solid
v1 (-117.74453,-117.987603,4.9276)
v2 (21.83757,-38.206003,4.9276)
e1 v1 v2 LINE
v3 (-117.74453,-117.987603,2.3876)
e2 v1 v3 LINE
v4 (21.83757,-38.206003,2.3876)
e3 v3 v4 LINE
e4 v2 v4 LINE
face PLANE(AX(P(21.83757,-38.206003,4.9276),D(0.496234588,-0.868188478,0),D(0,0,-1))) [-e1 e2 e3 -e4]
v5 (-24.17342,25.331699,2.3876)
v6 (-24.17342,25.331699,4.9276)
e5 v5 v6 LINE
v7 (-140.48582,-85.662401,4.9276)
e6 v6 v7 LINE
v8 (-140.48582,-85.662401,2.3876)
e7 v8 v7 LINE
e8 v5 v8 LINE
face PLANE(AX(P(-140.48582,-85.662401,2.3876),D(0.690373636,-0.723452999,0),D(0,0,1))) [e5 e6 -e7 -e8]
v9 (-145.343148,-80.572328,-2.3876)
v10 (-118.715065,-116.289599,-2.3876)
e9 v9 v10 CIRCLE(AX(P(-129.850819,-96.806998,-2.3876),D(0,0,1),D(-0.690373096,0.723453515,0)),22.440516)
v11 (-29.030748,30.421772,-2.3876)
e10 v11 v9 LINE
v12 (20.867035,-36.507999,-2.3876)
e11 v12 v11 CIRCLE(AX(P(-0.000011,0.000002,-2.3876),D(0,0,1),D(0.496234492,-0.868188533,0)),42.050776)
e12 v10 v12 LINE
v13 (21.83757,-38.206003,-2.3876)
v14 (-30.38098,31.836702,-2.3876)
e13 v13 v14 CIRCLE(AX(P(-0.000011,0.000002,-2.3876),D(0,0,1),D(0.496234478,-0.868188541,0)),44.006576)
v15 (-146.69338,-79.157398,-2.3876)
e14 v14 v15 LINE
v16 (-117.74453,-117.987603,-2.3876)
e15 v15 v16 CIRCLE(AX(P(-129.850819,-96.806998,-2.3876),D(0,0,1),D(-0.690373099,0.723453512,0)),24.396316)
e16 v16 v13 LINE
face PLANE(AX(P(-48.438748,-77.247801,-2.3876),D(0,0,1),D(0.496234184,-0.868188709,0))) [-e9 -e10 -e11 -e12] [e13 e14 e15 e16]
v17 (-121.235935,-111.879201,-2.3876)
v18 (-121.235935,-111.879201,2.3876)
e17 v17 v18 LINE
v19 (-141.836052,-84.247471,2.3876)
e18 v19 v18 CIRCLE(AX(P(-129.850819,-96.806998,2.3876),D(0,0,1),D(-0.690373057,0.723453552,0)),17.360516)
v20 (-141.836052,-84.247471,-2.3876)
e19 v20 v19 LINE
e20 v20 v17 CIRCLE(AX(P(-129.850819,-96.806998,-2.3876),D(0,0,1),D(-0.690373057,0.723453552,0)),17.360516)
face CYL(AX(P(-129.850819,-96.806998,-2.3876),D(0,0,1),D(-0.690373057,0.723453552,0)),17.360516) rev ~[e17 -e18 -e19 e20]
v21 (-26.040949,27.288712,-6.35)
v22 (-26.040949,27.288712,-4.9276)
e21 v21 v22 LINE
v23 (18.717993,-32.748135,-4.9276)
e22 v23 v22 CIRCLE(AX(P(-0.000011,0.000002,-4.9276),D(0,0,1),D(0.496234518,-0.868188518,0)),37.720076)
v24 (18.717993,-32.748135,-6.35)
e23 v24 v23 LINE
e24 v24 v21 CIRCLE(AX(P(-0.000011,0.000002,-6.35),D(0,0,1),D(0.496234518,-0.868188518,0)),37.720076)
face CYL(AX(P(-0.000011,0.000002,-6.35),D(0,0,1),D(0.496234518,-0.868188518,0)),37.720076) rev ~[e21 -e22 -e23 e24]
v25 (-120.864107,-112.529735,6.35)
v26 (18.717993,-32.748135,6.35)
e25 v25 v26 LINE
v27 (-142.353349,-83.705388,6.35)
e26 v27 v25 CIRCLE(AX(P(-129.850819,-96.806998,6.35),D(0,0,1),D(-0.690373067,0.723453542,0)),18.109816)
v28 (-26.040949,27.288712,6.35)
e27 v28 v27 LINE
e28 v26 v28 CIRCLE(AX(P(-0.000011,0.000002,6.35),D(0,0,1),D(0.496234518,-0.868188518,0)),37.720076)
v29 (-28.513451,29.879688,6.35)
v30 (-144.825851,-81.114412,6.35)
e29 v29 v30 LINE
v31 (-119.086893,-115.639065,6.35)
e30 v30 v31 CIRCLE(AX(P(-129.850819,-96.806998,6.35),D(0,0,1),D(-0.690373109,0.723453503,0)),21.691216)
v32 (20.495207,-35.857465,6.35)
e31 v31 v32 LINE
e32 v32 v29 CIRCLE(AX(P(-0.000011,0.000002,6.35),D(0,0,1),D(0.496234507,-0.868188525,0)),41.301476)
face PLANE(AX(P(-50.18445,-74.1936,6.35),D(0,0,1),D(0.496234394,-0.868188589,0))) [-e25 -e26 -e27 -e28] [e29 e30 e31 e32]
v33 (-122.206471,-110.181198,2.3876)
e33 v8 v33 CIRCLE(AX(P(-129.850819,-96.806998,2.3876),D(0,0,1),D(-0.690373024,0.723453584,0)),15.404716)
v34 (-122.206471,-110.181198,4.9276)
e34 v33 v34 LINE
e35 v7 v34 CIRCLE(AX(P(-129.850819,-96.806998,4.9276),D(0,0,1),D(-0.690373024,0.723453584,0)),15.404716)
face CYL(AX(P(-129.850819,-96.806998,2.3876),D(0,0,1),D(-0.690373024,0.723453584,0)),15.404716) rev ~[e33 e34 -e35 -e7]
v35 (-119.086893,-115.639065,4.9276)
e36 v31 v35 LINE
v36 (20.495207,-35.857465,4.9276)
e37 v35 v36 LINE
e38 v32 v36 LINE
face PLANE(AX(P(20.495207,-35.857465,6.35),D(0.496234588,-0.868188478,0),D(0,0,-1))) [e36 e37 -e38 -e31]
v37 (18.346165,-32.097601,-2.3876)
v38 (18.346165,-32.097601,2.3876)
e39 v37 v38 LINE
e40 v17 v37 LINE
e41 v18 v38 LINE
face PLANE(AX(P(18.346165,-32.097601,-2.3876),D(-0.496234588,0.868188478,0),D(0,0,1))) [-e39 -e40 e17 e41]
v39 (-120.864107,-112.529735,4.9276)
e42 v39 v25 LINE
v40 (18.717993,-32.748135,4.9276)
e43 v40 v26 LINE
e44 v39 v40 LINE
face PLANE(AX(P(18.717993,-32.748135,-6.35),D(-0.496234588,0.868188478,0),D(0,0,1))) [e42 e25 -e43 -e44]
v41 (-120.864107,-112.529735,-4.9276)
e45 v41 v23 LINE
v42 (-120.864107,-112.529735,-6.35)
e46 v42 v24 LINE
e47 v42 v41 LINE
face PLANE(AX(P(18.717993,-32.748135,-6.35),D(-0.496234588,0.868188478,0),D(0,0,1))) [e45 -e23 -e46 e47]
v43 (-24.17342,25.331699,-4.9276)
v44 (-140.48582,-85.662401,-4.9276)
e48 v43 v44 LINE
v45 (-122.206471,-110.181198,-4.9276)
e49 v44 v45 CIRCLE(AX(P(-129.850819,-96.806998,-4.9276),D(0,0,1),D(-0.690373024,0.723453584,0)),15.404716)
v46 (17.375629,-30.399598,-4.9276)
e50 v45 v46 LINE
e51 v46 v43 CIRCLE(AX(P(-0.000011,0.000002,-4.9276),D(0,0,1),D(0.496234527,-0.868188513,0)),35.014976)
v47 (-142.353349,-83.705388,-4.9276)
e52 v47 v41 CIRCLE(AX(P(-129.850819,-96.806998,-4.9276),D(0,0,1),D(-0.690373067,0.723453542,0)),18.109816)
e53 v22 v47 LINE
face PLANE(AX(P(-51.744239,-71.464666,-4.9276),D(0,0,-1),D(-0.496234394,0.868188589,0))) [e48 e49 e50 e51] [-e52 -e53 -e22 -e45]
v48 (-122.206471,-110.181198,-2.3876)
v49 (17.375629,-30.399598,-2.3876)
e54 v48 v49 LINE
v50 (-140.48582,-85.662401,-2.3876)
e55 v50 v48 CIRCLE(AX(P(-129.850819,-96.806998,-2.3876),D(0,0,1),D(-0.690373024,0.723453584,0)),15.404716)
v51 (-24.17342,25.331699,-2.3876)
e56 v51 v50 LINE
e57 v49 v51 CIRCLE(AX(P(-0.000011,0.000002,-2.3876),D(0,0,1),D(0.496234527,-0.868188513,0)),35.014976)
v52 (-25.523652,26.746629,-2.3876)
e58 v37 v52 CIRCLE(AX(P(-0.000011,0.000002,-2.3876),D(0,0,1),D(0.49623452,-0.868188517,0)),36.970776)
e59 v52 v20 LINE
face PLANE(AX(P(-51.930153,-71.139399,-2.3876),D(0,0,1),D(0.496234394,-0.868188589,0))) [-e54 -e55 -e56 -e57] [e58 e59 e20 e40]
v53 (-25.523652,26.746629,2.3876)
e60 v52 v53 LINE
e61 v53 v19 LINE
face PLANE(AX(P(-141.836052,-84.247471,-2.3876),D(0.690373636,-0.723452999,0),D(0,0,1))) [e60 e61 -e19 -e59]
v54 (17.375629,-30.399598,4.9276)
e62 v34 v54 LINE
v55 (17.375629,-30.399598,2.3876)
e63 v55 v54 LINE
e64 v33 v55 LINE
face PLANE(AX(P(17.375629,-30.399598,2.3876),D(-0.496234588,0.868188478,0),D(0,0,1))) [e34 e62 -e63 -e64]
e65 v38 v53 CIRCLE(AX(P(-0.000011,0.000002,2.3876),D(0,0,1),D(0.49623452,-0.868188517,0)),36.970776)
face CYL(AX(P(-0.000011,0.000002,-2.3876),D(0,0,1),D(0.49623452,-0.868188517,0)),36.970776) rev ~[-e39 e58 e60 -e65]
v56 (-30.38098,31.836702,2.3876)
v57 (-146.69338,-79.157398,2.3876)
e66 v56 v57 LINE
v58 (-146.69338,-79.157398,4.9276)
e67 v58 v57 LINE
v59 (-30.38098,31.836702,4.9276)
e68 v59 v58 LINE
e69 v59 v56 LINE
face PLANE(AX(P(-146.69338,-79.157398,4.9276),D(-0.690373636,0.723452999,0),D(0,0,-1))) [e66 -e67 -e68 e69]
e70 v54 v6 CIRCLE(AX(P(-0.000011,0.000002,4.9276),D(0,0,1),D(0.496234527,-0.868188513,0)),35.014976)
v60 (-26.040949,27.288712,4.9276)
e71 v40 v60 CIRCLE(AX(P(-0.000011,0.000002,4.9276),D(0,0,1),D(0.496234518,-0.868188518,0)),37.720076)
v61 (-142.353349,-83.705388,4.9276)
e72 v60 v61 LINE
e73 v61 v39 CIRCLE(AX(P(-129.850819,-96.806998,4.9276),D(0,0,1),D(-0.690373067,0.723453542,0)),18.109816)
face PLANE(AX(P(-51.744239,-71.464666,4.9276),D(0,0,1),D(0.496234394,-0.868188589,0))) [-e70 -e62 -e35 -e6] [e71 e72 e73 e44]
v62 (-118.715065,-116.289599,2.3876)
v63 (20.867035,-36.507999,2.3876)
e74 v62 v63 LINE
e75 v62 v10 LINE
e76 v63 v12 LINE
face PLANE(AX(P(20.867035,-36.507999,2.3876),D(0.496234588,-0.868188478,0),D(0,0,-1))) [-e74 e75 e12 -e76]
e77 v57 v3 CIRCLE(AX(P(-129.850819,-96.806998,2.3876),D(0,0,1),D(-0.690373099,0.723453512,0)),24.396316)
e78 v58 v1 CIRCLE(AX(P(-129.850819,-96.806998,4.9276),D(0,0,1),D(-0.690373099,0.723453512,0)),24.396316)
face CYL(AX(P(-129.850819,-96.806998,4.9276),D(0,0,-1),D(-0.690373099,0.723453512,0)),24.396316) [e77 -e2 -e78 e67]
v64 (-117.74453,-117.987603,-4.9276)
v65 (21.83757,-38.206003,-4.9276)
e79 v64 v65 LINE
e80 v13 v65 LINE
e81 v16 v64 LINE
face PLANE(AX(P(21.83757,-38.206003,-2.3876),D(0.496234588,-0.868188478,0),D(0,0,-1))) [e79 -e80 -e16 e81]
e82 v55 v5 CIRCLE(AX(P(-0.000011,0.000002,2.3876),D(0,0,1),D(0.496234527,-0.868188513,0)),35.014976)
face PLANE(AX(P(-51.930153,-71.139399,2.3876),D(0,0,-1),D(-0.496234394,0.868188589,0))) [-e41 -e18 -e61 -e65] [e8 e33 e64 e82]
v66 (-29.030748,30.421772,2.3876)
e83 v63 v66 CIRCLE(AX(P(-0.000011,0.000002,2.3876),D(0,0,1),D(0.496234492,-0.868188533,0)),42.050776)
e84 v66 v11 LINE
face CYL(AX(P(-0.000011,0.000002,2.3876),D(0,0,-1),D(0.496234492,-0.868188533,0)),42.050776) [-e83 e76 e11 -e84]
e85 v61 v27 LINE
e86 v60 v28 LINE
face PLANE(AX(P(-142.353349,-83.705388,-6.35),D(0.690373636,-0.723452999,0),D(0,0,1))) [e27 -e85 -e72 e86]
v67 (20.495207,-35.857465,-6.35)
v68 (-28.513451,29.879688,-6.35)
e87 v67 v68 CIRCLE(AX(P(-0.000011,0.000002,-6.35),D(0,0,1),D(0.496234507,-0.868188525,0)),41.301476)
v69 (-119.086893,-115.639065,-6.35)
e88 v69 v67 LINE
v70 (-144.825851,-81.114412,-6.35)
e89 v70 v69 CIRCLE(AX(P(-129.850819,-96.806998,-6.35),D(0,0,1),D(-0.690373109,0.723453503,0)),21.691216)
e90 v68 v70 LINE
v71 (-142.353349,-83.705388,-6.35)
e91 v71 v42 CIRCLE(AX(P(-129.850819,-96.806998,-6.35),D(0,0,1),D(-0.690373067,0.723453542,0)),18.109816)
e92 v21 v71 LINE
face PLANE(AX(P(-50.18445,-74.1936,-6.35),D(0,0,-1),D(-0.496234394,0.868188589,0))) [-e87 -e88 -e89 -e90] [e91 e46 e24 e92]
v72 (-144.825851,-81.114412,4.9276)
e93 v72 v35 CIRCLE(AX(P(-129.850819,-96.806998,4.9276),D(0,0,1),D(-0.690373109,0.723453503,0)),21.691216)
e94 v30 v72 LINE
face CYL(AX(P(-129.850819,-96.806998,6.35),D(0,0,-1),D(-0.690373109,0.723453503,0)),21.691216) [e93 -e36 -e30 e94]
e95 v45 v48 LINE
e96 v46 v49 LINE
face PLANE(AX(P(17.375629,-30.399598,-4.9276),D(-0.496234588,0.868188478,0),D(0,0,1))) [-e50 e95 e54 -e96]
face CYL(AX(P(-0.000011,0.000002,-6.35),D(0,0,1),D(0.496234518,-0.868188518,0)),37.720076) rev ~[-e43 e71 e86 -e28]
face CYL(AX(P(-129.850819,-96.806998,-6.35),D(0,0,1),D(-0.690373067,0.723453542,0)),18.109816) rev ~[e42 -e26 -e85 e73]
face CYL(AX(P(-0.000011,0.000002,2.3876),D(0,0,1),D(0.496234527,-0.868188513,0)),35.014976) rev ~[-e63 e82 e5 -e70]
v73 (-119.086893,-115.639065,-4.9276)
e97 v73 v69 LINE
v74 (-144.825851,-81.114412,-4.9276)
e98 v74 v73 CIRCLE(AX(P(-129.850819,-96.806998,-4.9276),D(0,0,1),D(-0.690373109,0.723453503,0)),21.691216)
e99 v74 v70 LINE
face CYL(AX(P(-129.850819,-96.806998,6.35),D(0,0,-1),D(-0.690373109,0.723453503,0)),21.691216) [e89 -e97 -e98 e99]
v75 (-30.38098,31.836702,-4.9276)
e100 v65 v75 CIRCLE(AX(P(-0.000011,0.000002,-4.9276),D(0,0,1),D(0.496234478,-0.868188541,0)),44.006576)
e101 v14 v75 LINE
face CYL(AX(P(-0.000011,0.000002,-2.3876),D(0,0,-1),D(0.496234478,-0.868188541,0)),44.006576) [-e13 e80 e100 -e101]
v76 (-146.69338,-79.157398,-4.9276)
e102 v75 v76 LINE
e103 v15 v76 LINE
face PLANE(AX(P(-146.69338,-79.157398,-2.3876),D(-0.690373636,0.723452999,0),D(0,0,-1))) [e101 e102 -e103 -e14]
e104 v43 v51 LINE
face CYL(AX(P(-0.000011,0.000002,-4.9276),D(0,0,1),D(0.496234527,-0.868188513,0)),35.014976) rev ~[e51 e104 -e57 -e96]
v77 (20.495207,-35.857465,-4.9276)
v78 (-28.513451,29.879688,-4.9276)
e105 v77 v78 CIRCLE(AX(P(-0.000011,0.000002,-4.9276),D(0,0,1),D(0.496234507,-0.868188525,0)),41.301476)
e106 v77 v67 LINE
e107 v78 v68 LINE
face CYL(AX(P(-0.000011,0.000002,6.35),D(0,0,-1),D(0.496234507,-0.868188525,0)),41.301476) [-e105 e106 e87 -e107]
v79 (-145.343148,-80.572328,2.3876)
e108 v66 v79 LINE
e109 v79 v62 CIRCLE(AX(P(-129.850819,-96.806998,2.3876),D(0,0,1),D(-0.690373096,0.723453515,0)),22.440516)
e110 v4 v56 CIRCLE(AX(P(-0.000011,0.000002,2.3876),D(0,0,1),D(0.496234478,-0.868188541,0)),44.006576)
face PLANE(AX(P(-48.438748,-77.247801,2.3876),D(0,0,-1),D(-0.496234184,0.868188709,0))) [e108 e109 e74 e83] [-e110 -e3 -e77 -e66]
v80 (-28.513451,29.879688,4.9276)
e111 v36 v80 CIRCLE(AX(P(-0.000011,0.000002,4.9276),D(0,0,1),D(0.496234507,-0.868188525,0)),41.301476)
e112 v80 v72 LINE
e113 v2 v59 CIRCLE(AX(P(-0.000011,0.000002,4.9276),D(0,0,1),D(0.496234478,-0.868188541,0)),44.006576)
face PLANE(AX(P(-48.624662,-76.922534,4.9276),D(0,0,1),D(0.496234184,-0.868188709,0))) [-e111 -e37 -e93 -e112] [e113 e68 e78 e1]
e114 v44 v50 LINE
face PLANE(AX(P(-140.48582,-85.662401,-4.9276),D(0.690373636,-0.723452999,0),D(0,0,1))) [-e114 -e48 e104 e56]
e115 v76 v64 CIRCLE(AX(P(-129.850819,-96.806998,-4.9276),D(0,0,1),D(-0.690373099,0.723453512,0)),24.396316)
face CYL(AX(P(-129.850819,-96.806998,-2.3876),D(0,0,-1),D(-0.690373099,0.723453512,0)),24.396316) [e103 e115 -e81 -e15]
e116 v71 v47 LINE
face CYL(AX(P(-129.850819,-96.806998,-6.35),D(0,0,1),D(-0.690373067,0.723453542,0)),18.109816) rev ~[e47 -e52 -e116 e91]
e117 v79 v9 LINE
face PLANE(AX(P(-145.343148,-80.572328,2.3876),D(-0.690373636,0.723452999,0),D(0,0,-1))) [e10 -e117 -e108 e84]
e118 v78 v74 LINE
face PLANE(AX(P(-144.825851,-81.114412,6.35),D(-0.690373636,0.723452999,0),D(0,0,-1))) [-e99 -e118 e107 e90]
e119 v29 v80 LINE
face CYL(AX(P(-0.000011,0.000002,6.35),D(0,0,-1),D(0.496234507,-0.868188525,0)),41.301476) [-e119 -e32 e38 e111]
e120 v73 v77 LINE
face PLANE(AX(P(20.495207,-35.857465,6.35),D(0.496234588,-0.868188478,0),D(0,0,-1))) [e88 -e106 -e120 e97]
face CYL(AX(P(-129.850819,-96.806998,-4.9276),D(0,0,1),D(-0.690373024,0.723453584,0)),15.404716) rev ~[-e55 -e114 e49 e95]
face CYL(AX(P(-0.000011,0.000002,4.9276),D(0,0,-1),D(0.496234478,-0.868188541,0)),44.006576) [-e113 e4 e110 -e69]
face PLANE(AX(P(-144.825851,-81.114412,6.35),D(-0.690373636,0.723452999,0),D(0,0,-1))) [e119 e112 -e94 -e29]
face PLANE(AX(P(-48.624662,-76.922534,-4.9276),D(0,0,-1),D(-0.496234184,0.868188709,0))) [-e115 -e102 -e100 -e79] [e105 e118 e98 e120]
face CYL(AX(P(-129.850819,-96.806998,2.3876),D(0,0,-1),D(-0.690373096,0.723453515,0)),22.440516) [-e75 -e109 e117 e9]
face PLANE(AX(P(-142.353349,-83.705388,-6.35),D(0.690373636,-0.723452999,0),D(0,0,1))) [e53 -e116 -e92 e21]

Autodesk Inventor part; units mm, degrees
ref_plane "Work Plane2" through (-129.8508, -96.807, 0) normal (-1, 0, 0) x (0, 0, 1)
ref_plane "Work Plane3" through (0, 0, 0) normal (-0.8287064, -0.5596835, 0) x (0, 0, 1)
sketch "Path" plane through (0, 0, 0) normal (0, 0, 1) x (1, 0, 0)
  arc A0 (-143.5896, -82.4099) -> (-119.9755, -114.0844) centre (-129.8508, -96.807) ccw
  arc A1 (19.6066, -34.3028) -> (-27.2772, 28.5842) centre (0, 0) ccw
  line L0 (19.6066, -34.3028) -> (-119.9755, -114.0844)
  line L1 (-143.5896, -82.4099) -> (-27.2772, 28.5842)
  dimension "d31" = 8.9916
ref_plane "Section Plane" through (-119.9755, -114.0844, 0) normal (0.8681886, 0.4962344, 0) x (0, 0, 1)
sketch "Section Sketch" plane through (-119.9755, -114.0844, 0) normal (0.8681886, 0.4962344, 0) x (0, 0, 1)
  line L0 (-6.35, -1.7907) -> (6.35, -1.7907)
  line L1 (6.35, -1.7907) -> (6.35, 1.7907)
  line L2 (6.35, 1.7907) -> (-6.35, 1.7907)
  line L3 (-6.35, 1.7907) -> (-6.35, -1.7907)
  line L4 (-2.3876, -2.54) -> (2.3876, -2.54)
  line L5 (2.3876, -2.54) -> (2.3876, 2.54)
  line L6 (2.3876, 2.54) -> (-2.3876, 2.54)
  line L7 (-2.3876, 2.54) -> (-2.3876, -2.54)
  line L8 (-2.3876, 0) -> (2.3876, 0) construction
  line L9 (-4.9276, -4.4958) -> (-2.3876, -4.4958)
  line L10 (-2.3876, -4.4958) -> (-2.3876, 4.4958)
  line L11 (-2.3876, 4.4958) -> (-4.9276, 4.4958)
  line L12 (-4.9276, 4.4958) -> (-4.9276, -4.4958)
  line L13 (2.3876, -4.4958) -> (4.9276, -4.4958)
  line L14 (4.9276, -4.4958) -> (4.9276, 4.4958)
  line L15 (4.9276, 4.4958) -> (2.3876, 4.4958)
  line L16 (2.3876, 4.4958) -> (2.3876, -4.4958)
  line L17 (-6.35, 0) -> (6.35, 0) construction
  point P0 (0, 0)
  point P1 (0, 0)
  dimension "d21" = 3.5814
  dimension "d22" = 5.08
  dimension "d23" = 4.7752
  dimension "d24" = 2.54
  dimension "d31" = 8.9916
  dimension "d32" = 12.7
sweep "Solid" add profiles "Section Sketch" path "Path"
pattern_of_one "Strand Pattern"
equation "\"d21\" = da_d2"
equation "\"d22\" = da_d1"
equation "\"d23\" = da_b1"
equation "\"d24\" = da_t1 + da_t2"
equation "\"d30\" = da_pt"
equation "\"da_p\" = 9.525"
equation "\"da_b1\" = 4.7752"
equation "\"da_h2\" = 8.9916"
equation "\"da_h3\" = 7.7978"
equation "\"da_d1\" = 5.08"
equation "\"da_d2\" = 3.5814"
equation "\"da_pt\" = 10.1346"
equation "\"da_b\" = 12.7"
equation "\"da_t1\" = 1.27"
equation "\"da_t2\" = 1.27"
properties part number "Roller Chain"
